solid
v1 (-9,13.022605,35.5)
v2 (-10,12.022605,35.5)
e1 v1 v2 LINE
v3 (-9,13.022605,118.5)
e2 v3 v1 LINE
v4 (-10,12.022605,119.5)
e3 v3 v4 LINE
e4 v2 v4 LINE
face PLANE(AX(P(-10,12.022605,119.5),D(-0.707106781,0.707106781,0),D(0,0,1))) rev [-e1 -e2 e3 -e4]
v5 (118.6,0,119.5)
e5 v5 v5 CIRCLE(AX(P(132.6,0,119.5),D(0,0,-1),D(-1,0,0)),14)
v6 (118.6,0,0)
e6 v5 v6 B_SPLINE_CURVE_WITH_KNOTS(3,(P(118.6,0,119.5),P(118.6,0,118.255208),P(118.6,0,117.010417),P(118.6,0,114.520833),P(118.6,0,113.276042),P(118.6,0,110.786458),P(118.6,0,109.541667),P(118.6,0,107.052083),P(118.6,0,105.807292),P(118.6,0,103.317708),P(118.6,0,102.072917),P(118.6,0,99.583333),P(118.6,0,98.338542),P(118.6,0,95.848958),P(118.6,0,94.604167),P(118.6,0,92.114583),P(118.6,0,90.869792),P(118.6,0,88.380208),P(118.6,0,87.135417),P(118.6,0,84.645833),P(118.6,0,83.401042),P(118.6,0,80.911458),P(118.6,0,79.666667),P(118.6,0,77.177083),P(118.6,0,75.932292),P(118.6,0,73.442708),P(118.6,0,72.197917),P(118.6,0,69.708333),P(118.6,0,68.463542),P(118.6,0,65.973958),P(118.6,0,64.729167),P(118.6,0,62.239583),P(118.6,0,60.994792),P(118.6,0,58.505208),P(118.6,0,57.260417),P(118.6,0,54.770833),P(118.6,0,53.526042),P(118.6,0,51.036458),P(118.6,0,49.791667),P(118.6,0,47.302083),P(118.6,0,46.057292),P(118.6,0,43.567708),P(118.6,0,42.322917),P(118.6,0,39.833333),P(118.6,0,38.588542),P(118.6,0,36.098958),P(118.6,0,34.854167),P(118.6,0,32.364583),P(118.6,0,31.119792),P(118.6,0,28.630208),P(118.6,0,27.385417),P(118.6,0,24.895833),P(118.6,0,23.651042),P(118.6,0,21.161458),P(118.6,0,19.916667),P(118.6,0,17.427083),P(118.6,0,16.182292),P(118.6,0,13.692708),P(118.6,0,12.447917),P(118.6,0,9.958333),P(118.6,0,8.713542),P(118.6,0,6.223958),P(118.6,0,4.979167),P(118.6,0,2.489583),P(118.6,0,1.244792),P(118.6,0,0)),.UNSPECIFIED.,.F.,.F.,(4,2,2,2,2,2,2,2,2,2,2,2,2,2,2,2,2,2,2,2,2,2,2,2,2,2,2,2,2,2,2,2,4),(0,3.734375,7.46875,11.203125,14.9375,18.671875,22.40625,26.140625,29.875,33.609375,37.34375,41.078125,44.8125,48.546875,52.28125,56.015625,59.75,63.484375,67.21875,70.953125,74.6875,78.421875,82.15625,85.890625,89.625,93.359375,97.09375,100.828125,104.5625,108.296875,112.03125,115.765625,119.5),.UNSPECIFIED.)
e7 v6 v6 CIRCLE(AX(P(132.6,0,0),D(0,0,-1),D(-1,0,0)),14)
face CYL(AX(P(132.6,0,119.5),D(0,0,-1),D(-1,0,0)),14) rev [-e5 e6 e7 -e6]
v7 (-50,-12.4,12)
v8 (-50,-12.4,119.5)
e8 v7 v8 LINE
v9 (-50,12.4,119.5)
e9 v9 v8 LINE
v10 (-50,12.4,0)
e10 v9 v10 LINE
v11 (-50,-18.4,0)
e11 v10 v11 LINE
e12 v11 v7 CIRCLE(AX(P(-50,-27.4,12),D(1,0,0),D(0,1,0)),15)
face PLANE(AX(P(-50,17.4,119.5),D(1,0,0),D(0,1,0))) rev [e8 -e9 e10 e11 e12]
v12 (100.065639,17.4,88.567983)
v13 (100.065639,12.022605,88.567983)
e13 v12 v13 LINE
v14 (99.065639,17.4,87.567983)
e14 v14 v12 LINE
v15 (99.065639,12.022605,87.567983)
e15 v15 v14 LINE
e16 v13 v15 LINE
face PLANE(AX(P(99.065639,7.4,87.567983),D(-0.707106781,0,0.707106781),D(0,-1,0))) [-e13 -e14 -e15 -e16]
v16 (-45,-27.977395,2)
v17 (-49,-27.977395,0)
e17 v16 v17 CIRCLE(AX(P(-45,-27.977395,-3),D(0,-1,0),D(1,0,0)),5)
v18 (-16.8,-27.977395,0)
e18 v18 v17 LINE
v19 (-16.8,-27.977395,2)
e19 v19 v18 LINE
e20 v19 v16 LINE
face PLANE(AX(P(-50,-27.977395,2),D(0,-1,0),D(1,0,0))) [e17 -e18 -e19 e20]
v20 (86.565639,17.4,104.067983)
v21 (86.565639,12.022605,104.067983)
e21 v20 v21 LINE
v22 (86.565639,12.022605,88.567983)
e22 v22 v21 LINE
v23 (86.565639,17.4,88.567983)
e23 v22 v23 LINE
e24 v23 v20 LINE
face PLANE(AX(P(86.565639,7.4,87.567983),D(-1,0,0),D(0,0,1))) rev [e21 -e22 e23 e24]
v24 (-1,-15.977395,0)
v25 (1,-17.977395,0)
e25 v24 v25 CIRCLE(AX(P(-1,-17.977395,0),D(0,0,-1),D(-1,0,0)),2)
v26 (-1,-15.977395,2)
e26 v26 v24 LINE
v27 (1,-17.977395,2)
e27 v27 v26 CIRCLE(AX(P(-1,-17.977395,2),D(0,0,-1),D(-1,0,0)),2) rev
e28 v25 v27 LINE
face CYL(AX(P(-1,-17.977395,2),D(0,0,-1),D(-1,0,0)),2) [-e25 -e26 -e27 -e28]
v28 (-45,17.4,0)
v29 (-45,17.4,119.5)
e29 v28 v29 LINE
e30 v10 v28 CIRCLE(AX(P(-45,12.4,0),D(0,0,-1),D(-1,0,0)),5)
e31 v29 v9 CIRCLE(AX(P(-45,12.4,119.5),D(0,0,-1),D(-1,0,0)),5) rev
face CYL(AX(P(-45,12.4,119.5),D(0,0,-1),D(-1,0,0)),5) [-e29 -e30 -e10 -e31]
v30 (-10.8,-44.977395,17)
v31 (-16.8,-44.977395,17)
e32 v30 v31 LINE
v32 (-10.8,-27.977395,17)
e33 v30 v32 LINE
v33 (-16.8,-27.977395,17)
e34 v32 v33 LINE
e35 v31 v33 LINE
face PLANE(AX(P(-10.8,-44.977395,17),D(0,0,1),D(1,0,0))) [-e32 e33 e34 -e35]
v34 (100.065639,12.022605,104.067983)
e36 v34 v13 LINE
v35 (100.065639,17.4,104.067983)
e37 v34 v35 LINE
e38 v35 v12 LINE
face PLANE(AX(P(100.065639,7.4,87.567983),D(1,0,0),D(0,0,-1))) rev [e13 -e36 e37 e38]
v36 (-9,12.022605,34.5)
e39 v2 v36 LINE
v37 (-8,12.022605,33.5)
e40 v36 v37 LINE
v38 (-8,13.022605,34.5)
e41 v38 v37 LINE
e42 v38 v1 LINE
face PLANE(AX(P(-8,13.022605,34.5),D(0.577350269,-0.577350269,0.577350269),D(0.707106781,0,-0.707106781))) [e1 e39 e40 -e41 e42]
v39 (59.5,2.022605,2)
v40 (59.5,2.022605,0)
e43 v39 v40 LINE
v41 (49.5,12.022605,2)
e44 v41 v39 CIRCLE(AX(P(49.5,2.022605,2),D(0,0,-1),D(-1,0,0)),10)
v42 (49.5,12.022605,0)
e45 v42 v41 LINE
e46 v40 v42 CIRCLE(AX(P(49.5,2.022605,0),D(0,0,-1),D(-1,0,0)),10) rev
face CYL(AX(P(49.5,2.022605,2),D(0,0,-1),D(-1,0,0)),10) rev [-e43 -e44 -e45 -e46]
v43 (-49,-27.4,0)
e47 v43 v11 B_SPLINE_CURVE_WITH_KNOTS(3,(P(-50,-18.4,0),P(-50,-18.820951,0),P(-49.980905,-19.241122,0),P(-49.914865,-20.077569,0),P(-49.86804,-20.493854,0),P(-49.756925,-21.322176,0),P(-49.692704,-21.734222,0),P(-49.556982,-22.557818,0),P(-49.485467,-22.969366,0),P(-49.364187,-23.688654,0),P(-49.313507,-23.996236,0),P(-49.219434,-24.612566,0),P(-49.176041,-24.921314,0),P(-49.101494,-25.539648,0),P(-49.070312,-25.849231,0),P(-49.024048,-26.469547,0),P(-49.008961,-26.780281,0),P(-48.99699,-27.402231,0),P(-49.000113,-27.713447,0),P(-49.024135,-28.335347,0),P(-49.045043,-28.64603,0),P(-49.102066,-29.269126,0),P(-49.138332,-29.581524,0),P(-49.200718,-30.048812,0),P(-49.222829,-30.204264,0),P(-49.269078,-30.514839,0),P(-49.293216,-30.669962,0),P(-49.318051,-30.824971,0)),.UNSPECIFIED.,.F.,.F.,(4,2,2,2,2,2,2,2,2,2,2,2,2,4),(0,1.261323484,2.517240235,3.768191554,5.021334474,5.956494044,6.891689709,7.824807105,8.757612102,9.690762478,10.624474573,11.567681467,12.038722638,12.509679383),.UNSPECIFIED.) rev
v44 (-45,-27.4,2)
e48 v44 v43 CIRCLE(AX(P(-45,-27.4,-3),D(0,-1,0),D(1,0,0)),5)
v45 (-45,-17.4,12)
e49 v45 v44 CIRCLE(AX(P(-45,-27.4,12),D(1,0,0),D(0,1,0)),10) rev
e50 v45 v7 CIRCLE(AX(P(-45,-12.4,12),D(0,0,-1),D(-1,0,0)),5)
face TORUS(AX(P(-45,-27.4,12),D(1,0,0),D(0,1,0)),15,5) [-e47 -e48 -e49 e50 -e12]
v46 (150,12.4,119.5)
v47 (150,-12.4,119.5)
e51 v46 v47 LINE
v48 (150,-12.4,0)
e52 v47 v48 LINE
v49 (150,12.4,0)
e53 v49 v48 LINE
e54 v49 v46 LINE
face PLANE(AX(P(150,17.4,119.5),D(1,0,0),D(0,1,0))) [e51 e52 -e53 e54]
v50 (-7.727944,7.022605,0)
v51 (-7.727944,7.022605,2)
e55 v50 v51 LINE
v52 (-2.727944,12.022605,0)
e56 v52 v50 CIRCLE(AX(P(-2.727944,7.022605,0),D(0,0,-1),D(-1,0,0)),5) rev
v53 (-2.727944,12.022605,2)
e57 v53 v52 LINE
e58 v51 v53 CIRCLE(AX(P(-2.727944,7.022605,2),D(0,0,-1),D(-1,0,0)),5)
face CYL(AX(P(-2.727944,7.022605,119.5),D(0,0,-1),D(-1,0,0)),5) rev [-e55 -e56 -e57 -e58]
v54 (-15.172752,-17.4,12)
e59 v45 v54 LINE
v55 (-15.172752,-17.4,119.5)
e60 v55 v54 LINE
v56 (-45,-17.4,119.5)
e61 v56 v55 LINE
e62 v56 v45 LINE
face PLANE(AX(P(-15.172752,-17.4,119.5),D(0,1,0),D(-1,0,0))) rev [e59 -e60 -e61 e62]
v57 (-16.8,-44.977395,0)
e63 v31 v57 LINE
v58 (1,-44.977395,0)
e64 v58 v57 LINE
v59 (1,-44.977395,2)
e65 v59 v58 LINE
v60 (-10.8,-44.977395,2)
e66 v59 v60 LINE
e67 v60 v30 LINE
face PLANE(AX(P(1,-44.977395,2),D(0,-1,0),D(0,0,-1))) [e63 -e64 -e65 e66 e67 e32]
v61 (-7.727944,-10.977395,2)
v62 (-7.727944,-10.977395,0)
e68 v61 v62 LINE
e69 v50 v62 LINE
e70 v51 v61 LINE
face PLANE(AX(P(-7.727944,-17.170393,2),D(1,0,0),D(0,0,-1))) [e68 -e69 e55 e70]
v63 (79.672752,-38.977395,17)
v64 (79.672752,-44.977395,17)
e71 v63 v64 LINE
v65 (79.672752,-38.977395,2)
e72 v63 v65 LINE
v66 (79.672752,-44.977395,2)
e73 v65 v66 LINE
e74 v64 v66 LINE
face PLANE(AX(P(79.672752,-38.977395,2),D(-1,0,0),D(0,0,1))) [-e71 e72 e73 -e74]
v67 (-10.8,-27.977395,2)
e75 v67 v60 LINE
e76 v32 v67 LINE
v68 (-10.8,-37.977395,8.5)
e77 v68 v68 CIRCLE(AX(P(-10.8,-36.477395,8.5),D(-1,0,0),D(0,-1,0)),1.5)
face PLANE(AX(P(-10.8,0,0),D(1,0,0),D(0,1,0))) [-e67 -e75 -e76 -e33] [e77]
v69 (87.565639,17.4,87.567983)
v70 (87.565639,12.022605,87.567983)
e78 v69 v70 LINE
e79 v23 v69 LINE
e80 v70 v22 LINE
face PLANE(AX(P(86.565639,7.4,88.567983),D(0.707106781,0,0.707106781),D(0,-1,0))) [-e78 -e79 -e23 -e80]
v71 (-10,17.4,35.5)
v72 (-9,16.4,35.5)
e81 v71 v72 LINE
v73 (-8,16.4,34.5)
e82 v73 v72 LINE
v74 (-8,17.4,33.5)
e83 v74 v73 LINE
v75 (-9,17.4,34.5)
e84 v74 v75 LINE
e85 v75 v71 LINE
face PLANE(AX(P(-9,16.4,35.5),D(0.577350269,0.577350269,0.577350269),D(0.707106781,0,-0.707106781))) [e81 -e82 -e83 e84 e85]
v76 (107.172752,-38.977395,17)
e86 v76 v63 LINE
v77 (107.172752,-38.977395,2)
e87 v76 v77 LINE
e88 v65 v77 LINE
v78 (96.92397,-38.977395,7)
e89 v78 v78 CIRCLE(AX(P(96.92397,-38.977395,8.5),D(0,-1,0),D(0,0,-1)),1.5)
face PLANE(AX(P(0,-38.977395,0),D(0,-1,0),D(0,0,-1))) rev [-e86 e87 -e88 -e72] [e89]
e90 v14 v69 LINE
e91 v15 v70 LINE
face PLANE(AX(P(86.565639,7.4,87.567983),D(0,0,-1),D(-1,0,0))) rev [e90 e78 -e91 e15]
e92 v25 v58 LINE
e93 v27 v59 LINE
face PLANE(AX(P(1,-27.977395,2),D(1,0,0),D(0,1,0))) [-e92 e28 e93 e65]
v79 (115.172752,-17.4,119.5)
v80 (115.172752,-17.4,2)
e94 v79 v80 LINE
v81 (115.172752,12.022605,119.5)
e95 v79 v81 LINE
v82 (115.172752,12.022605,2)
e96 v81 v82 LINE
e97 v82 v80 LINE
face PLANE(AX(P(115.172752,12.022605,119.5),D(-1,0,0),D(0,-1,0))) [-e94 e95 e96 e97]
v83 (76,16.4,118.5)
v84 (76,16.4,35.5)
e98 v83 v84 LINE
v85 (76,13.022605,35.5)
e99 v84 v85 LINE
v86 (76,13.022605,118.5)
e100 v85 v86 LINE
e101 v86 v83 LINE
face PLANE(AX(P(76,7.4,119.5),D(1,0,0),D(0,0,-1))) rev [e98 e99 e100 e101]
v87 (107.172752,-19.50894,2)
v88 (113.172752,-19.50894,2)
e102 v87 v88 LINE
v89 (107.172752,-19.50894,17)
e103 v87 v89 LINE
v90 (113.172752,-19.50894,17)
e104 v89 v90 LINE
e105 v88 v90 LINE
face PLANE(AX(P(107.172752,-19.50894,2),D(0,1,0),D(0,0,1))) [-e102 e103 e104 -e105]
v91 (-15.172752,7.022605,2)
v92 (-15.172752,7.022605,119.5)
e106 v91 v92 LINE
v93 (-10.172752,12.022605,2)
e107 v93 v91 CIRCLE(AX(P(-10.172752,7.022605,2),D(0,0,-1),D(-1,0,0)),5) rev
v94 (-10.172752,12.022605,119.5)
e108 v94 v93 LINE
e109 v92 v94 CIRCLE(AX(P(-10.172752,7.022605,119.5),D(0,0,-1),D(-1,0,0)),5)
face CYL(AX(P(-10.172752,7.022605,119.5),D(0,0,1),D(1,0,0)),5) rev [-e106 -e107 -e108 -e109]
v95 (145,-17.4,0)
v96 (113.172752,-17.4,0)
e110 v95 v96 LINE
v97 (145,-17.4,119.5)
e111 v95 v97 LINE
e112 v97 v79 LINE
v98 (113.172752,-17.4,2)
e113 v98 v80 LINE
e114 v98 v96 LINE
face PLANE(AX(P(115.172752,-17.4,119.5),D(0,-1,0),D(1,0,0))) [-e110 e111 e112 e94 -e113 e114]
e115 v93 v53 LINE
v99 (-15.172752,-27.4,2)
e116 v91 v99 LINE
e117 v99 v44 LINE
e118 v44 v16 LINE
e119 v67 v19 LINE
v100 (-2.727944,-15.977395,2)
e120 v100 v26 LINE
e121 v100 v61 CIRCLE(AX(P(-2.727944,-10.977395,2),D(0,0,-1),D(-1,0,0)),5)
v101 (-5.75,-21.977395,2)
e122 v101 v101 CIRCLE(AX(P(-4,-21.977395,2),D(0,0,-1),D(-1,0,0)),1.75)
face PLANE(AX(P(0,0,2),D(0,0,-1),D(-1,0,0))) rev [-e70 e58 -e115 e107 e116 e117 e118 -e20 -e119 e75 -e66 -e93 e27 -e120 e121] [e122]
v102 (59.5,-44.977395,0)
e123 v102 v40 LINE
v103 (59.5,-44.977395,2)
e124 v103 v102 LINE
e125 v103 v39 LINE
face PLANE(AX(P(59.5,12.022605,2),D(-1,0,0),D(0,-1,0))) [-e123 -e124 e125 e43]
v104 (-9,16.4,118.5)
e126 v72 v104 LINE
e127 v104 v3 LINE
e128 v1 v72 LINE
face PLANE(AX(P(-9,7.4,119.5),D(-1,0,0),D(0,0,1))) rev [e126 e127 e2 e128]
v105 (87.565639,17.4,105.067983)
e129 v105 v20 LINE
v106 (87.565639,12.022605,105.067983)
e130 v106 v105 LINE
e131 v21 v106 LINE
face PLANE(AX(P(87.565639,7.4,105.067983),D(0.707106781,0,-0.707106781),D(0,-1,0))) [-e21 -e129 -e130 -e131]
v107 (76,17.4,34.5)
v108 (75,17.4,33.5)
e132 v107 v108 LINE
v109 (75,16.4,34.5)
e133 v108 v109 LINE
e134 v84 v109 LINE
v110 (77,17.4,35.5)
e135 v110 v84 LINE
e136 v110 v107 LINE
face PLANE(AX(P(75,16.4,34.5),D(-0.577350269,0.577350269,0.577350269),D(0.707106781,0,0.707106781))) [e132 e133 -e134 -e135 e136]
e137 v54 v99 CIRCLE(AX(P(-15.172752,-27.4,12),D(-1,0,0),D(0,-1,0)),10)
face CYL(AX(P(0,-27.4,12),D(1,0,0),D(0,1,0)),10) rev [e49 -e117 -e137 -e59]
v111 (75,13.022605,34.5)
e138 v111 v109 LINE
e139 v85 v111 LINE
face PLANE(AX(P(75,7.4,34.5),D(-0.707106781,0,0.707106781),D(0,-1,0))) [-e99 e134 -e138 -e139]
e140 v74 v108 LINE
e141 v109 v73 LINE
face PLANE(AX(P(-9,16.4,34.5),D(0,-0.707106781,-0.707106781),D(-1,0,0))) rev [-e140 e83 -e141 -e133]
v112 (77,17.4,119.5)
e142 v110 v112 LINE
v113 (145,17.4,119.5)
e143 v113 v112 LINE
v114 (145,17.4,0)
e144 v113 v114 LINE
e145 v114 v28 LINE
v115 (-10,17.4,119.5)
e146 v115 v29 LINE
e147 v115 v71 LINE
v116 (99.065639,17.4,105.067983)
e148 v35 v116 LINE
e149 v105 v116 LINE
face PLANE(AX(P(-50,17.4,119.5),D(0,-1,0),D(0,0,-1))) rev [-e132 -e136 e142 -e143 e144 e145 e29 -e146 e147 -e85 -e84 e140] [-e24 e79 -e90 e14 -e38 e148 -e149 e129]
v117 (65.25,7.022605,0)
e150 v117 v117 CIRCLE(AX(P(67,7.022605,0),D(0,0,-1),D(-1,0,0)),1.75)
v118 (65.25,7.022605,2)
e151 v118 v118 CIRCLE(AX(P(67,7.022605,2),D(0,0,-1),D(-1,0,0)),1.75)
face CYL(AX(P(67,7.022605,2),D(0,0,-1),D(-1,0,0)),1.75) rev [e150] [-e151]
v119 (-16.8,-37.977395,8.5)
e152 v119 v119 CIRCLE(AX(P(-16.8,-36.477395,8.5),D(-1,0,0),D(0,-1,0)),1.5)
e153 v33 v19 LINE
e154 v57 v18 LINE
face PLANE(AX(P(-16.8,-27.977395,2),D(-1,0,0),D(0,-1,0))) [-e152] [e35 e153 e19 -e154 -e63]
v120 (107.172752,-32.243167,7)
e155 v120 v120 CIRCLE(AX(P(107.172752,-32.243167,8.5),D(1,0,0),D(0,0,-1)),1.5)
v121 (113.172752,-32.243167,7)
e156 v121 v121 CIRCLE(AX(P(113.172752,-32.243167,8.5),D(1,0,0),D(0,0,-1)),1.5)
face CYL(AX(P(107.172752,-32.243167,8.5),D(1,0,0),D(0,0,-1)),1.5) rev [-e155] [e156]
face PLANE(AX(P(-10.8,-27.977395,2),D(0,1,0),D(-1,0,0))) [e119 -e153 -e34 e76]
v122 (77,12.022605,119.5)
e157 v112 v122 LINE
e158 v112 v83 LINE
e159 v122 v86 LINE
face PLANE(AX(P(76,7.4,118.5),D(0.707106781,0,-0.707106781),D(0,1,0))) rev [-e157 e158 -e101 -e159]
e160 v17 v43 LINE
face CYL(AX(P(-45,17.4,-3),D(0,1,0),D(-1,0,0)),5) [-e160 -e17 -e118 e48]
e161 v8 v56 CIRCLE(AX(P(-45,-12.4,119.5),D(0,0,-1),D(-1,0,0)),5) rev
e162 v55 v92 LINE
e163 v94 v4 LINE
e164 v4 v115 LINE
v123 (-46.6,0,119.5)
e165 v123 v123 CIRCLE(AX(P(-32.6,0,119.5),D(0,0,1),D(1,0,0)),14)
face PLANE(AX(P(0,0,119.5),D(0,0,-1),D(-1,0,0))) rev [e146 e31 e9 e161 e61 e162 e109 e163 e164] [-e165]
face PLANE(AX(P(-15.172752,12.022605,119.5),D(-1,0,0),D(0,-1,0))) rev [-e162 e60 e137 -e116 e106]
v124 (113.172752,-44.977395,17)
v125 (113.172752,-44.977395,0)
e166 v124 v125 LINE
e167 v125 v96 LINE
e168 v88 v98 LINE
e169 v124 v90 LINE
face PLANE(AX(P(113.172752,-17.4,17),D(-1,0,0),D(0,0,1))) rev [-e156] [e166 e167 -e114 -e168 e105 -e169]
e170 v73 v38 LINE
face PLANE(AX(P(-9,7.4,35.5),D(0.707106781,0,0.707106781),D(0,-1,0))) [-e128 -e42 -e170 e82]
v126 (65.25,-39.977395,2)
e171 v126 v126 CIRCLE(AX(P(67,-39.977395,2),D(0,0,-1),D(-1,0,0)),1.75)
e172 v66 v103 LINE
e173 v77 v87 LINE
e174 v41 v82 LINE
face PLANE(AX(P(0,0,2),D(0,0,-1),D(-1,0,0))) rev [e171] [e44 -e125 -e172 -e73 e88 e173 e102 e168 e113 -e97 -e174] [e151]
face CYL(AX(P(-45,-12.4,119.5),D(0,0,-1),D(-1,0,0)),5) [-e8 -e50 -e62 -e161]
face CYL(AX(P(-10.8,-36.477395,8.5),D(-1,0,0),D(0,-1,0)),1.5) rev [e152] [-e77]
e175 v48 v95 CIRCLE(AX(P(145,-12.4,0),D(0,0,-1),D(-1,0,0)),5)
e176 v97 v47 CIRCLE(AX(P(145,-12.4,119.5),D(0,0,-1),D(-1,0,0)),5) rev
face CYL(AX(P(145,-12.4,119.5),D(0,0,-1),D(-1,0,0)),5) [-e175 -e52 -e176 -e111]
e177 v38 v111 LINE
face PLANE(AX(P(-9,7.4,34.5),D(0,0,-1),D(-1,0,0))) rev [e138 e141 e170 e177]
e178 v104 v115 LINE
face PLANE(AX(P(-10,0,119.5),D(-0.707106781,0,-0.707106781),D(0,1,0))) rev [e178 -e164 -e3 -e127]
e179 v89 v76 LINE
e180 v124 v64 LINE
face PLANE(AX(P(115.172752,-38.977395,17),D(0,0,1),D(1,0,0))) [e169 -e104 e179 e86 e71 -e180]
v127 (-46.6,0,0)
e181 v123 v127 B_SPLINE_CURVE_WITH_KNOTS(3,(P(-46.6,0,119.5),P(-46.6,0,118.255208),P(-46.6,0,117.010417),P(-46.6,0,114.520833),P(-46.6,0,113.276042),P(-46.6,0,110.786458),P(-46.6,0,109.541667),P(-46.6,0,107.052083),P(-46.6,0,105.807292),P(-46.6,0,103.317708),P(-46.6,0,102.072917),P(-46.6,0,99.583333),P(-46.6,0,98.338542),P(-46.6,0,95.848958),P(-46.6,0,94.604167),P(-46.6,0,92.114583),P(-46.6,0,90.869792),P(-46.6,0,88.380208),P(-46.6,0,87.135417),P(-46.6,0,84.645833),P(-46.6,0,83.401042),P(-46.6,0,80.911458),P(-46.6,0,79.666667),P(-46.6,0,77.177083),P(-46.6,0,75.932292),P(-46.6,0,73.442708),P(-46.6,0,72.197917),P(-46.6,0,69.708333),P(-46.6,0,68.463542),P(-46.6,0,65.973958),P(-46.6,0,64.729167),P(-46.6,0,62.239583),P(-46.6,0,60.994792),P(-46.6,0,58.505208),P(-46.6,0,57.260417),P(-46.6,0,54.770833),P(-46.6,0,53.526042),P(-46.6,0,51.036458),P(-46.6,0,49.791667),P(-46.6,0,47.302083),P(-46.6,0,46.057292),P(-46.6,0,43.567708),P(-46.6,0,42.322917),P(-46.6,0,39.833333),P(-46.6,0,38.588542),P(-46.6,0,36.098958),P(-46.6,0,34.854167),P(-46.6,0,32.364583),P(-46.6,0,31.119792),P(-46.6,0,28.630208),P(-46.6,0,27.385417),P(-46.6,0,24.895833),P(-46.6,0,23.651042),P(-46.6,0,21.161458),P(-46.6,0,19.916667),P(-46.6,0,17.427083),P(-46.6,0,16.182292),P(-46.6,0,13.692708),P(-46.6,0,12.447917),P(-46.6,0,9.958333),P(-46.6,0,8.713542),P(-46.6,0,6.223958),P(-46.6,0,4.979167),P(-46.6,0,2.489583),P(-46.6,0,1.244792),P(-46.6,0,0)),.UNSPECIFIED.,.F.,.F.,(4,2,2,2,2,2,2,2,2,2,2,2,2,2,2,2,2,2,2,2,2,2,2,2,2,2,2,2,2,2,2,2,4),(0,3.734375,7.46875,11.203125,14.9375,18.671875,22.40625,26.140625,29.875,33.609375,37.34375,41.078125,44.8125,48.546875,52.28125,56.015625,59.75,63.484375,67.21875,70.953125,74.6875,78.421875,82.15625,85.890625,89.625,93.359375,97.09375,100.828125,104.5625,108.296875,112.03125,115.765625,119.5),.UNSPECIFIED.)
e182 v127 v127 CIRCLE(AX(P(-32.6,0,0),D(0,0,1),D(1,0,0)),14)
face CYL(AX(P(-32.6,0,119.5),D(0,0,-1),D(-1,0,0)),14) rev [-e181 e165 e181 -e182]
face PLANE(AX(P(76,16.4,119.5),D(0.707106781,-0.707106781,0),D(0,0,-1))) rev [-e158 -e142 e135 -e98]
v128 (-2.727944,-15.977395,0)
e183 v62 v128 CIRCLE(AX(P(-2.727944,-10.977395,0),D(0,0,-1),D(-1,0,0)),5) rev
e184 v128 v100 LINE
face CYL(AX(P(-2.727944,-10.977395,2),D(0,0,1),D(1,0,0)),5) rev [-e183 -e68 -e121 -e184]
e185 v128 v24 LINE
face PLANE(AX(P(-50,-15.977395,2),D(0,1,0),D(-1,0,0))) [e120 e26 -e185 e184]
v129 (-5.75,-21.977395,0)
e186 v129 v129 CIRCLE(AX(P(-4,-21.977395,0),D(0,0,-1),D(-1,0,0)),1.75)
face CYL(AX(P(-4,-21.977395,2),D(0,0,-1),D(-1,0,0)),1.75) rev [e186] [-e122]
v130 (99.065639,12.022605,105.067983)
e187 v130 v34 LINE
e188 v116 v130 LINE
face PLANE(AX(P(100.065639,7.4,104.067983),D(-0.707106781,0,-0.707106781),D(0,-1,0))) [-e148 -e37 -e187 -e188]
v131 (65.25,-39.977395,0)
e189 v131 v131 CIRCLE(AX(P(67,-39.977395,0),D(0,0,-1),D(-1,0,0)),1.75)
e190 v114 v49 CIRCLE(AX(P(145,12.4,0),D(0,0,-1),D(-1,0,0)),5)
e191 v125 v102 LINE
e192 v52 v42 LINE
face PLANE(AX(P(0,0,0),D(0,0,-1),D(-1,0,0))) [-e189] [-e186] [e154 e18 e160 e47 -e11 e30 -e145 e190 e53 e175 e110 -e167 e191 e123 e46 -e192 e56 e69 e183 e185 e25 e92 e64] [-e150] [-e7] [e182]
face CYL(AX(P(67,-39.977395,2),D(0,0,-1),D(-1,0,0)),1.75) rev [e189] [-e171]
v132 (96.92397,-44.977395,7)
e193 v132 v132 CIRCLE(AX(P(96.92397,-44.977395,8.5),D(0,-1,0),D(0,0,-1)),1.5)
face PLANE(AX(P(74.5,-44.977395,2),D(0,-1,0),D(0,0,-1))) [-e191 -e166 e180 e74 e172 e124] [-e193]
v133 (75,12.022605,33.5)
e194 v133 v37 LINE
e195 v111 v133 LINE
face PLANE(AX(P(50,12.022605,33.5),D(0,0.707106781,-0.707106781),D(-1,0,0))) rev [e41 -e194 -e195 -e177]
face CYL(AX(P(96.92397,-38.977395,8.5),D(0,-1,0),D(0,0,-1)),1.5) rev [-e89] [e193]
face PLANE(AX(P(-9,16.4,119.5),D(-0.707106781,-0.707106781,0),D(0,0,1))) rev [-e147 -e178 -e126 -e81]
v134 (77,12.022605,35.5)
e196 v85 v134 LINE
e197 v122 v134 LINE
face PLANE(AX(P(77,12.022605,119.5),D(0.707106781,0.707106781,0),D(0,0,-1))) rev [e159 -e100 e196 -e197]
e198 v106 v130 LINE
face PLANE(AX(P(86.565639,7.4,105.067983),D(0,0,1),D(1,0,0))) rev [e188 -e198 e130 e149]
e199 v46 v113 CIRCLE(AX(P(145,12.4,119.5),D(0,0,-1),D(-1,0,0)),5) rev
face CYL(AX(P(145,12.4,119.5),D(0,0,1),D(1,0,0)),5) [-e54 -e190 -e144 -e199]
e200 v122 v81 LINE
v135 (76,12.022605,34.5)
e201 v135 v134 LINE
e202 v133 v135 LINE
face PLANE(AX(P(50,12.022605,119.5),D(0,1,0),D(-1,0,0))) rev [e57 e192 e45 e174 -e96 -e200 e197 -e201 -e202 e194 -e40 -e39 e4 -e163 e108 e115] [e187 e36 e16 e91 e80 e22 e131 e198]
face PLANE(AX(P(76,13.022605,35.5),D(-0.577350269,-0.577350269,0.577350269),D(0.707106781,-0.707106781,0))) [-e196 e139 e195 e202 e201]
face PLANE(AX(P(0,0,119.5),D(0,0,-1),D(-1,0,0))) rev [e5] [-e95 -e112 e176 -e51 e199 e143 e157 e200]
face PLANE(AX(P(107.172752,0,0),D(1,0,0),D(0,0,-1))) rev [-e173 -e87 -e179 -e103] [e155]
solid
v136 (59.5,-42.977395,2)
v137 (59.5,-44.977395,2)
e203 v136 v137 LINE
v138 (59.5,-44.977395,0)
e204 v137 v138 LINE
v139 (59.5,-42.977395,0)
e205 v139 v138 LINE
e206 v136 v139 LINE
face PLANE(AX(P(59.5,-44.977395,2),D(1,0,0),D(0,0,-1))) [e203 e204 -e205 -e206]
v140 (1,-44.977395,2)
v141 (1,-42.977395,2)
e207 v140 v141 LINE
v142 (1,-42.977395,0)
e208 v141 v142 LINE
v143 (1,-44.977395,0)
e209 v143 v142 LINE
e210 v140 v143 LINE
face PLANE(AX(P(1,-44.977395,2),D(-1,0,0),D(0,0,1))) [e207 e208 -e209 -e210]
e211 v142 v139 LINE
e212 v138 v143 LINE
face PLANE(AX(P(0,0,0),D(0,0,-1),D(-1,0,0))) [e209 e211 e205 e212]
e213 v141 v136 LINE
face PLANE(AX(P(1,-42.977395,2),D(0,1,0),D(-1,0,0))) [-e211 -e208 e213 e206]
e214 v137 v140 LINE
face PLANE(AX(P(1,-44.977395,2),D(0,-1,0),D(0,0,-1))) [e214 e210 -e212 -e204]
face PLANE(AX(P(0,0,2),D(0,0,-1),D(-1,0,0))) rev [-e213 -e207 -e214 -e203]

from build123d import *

# Parameters (mm, degrees)
SKETCH1_R            = 14
BOSS_EXTRUDE1_DEPTH  = 119.5
SKETCH5_W            = 85
SKETCH5_H            = 85
CUT_EXTRUDE2_DEPTH   = 10
CHAMFER2_SIZE        = 1
SKETCH6_W            = 15
SKETCH6_H            = 57
SKETCH6_W_2          = 51
SKETCH6_H_2          = 12
BOSS_EXTRUDE3_DEPTH  = 2
SKETCH7_R            = 1.75
CUT_EXTRUDE3_DEPTH   = 2
FILLET1_R            = 10
FILLET2_R            = 10
SKETCH8_W            = 13.5
SKETCH8_H            = 17.5
CUT_EXTRUDE4_DEPTH   = 10
CHAMFER4_SIZE        = 1
SKETCH10_W           = 9.140808063
SKETCH10_H           = 30.26858539
BOSS_EXTRUDE4_DEPTH  = 2
FILLET3_R            = 5
FILLET4_R            = 5
FILLET5_R            = 5
SKETCH11_W           = 40.67275181
SKETCH11_H           = 57
BOSS_EXTRUDE5_DEPTH  = 2
SKETCH13_W           = 35.5
SKETCH13_H           = 15
BOSS_EXTRUDE6_DEPTH  = 6
SKETCH14_W           = 2
SKETCH14_H           = 27.577394829
CUT_EXTRUDE5_DEPTH   = 17
SKETCH15_W           = 17.8
SKETCH15_H           = 17
BOSS_EXTRUDE7_DEPTH  = 2
SKETCH16_W           = 15
SKETCH16_H           = 17
BOSS_EXTRUDE8_DEPTH  = 6
FILLET6_R            = 2
SKETCH17_W           = 58.5
SKETCH17_H           = 2
BOSS_EXTRUDE9_DEPTH  = 2
SKETCH18_W           = 15
SKETCH18_H           = 19.468455061
BOSS_EXTRUDE10_DEPTH = 6
SKETCH19_R           = 1.5
CUT_EXTRUDE6_DEPTH   = 6
SKETCH21_R           = 1.5
CUT_EXTRUDE7_DEPTH   = 6
SKETCH22_R           = 1.5
CUT_EXTRUDE8_DEPTH   = 6


with BuildPart() as part:
    # Sketch1 → Boss-Extrude1 (new body)
    with BuildSketch(Plane.XY):
        Polygon((-50, 17.4), (-15.2, 17.4), (50, 17.4), (50, 12.022605171), (-15.17275181, 12.022605171), (-15.17275181, -17.4), (-50, -17.4), align=None)
        with Locations(Location((-32.6, 0, 0), (0, 0, 180))):
            Circle(SKETCH1_R, mode=Mode.SUBTRACT)
    boss_extrude1 = extrude(amount=BOSS_EXTRUDE1_DEPTH)

    # Mirror1: Boss-Extrude1 across plane
    add(boss_extrude1.mirror(Plane(origin=(50, 17.4, 119.5), x_dir=(0, 0, 1), z_dir=(-1, 0, 0))))

    # Sketch5 → Cut-Extrude2 (cut)
    with BuildSketch(Plane(origin=(0, 17.4, 0), x_dir=(1, 0, 0), z_dir=(0, 1, 0))):
        with Locations((33.5, -77)):
            Rectangle(SKETCH5_W, SKETCH5_H)
    extrude(amount=-CUT_EXTRUDE2_DEPTH, mode=Mode.SUBTRACT)

    # Chamfer2
    chamfer2_edges = [part.edges().sort_by_distance(p)[0] for p in [
        (-9, 12.022605171, 77),
        (-9, 14.711302586, 119.5),
        (33.5, 12.022605171, 34.5),
        (-9, 14.711302586, 34.5),
        (76, 12.022605171, 77),
        (76, 14.711302586, 34.5),
        (76, 14.711302586, 119.5),
        (-9, 17.4, 77),
        (76, 17.4, 77),
        (33.5, 17.4, 34.5),
    ]]
    chamfer(chamfer2_edges, length=CHAMFER2_SIZE)

    # Sketch6 → Boss-Extrude3 (add)
    with BuildSketch(Plane(origin=(0, 0, 0), x_dir=(-1, 0, 0), z_dir=(0, 0, -1))):
        with Locations((-67, -16.477394829)):
            Rectangle(SKETCH6_W, SKETCH6_H)
        with Locations((24.5, -21.977394829)):
            Rectangle(SKETCH6_W_2, SKETCH6_H_2)
    extrude(amount=-BOSS_EXTRUDE3_DEPTH)

    # Sketch7 → Cut-Extrude3 (cut)
    with BuildSketch(Plane(origin=(0, 0, 0), x_dir=(-1, 0, 0), z_dir=(0, 0, -1))):
        with Locations((4, -21.977394829)):
            Circle(SKETCH7_R)
        with Locations((-67, 7.022605171)):
            Circle(SKETCH7_R)
        with Locations((-67, -39.977394829)):
            Circle(SKETCH7_R)
    extrude(amount=-CUT_EXTRUDE3_DEPTH, mode=Mode.SUBTRACT)

    # Fillet1
    fillet1_edges = [part.edges().sort_by_distance(p)[0] for p in [
        (-32.586375905, -17.4, 2),
    ]]
    fillet(fillet1_edges, radius=FILLET1_R)

    # Fillet2
    fillet2_edges = [part.edges().sort_by_distance(p)[0] for p in [
        (59.5, 12.022605171, 1),
    ]]
    fillet(fillet2_edges, radius=FILLET2_R)

    # Sketch8 → Cut-Extrude4 (cut)
    with BuildSketch(Plane(origin=(0, 17.4, 0), x_dir=(1, 0, 0), z_dir=(0, 1, 0))):
        with Locations((93.315639073, -96.31798342)):
            Rectangle(SKETCH8_W, SKETCH8_H)
    extrude(amount=-CUT_EXTRUDE4_DEPTH, mode=Mode.SUBTRACT)

    # Chamfer4
    chamfer4_edges = [part.edges().sort_by_distance(p)[0] for p in [
        (86.565639073, 14.711302586, 105.06798342),
        (86.565639073, 14.711302586, 87.56798342),
        (100.065639073, 14.711302586, 87.56798342),
        (100.065639073, 14.711302586, 105.06798342),
    ]]
    chamfer(chamfer4_edges, length=CHAMFER4_SIZE)

    # Sketch10 → Boss-Extrude4 (add)
    with BuildSketch(Plane(origin=(0, 0, 0), x_dir=(-1, 0, 0), z_dir=(0, 0, -1))):
        with Locations((12.298347732, -2.03609998)):
            Rectangle(SKETCH10_W, SKETCH10_H)
    extrude(amount=-BOSS_EXTRUDE4_DEPTH)

    # Fillet3
    fillet3_edges = [part.edges().sort_by_distance(p)[0] for p in [
        (-7.7279437, -15.977394829, 1),
    ]]
    fillet(fillet3_edges, radius=FILLET3_R)

    # Fillet4
    fillet4_edges = [part.edges().sort_by_distance(p)[0] for p in [
        (-7.7279437, 12.022605171, 1),
    ]]
    fillet(fillet4_edges, radius=FILLET4_R)

    # Fillet5
    # the kernel refuses this fillet: 5 mm, written as the material it adds along each edge
    with BuildSketch(Plane(origin=(-15.17275181, 12.022605171, 2), x_dir=(0, -1, 0), z_dir=(0, 0, 1))) as fillet5_piece_1:
        with BuildLine():
            CenterArc((FILLET5_R, FILLET5_R), FILLET5_R, 180, 90)
            Line((0, FILLET5_R), (0, 0))
            Line((0, 0), (FILLET5_R, 0))
        make_face()
    extrude(amount=117.5)
    # the kernel refuses this fillet: 5 mm, written as the material it takes off along each edge
    with BuildSketch(Plane(origin=(150, 17.4, -12.5), x_dir=(-1, 0, 0), z_dir=(0, 0, 1)), Plane(origin=(150, -17.4, -12.5), x_dir=(0, 1, 0), z_dir=(0, 0, 1)), Plane(origin=(-50, 17.4, -12.5), x_dir=(0, -1, 0), z_dir=(0, 0, 1))) as fillet5_2_piece_1:
        with BuildLine():
            CenterArc((FILLET5_R, FILLET5_R), FILLET5_R, 180, 90)
            Line((0, FILLET5_R), (0, 0))
            Line((0, 0), (FILLET5_R, 0))
        make_face()
    extrude(amount=144.5, mode=Mode.SUBTRACT)
    with BuildSketch(Plane(origin=(-50, -27.4, 2), x_dir=(0, 0, -1), z_dir=(0, -1, 0))) as fillet5_2_piece_2:
        with BuildLine():
            CenterArc((FILLET5_R, FILLET5_R), FILLET5_R, 180, 90)
            Line((0, FILLET5_R), (0, 0))
            Line((0, 0), (FILLET5_R, 0))
        make_face()
    extrude(amount=13.077394829, mode=Mode.SUBTRACT)
    with BuildSketch(Plane(origin=(-50, -27.4, 12), x_dir=(0, 0, -1), z_dir=(0, -1, 0))) as fillet5_2_piece_3:
        with BuildLine():
            CenterArc((10 + FILLET5_R, FILLET5_R), FILLET5_R, 180, 90)
            Line((10, FILLET5_R), (10, 0))
            Line((10, 0), (10 + FILLET5_R, 0))
        make_face()
    revolve(axis=Axis((-50, -27.4, 12), (1, 0, 0)), revolution_arc=90, mode=Mode.SUBTRACT)
    with BuildSketch(Plane(origin=(-50, -17.4, 12), x_dir=(0, 1, 0), z_dir=(0, 0, 1))) as fillet5_2_piece_4:
        with BuildLine():
            CenterArc((FILLET5_R, -FILLET5_R), FILLET5_R, 90, 90)
            Line((0, -FILLET5_R), (0, 0))
            Line((0, 0), (FILLET5_R, 0))
        make_face()
    extrude(amount=120, mode=Mode.SUBTRACT)

    # Sketch11 → Boss-Extrude5 (add)
    with BuildSketch(Plane(origin=(0, 0, 0), x_dir=(-1, 0, 0), z_dir=(0, 0, -1))):
        with Locations((-94.836375905, -16.477394829)):
            Rectangle(SKETCH11_W, SKETCH11_H)
    extrude(amount=-BOSS_EXTRUDE5_DEPTH)

    # Sketch13 → Boss-Extrude6 (add)
    with BuildSketch(Plane(origin=(0, -44.977394829, 0), x_dir=(-1, 0, 0), z_dir=(0, -1, 0))):
        with Locations((-97.42275181, -9.5)):
            Rectangle(SKETCH13_W, SKETCH13_H)
    extrude(amount=-BOSS_EXTRUDE6_DEPTH)

    # Sketch14 → Cut-Extrude5 (cut)
    with BuildSketch(Plane(origin=(0, 0, 0), x_dir=(-1, 0, 0), z_dir=(0, 0, -1))):
        with Locations((-114.17275181, -31.188697415)):
            Rectangle(SKETCH14_W, SKETCH14_H)
    extrude(amount=-CUT_EXTRUDE5_DEPTH, mode=Mode.SUBTRACT)

    # Sketch15 → Boss-Extrude7 (add)
    with BuildSketch(Plane(origin=(0, 0, 0), x_dir=(-1, 0, 0), z_dir=(0, 0, -1))):
        with Locations((7.9, -36.477394829)):
            Rectangle(SKETCH15_W, SKETCH15_H)
    extrude(amount=-BOSS_EXTRUDE7_DEPTH)

    # Sketch16 → Boss-Extrude8 (add)
    with BuildSketch(Plane.ZY.offset(16.8)):
        with Locations((9.5, -36.477394829)):
            Rectangle(SKETCH16_W, SKETCH16_H)
    extrude(amount=-BOSS_EXTRUDE8_DEPTH)

    # Fillet6
    fillet6_edges = [part.edges().sort_by_distance(p)[0] for p in [
        (1, -15.977394829, 1),
    ]]
    fillet(fillet6_edges, radius=FILLET6_R)

    # Sketch18 → Boss-Extrude10 (add)
    with BuildSketch(Plane(origin=(113.17275181, 0, 0), x_dir=(0, 0, -1), z_dir=(1, 0, 0))):
        with Locations((-9.5, -29.243167299)):
            Rectangle(SKETCH18_W, SKETCH18_H)
    extrude(amount=-BOSS_EXTRUDE10_DEPTH)

    # Sketch19 → Cut-Extrude6 (cut)
    with BuildSketch(Plane(origin=(113.17275181, 0, 0), x_dir=(0, 0, -1), z_dir=(1, 0, 0))):
        with Locations((-8.5, -32.243167298)):
            Circle(SKETCH19_R)
    extrude(amount=-CUT_EXTRUDE6_DEPTH, mode=Mode.SUBTRACT)

    # Sketch21 → Cut-Extrude7 (cut)
    with BuildSketch(Plane.XZ.offset(44.977394829)):
        with Locations(Location((96.923969756, 8.5, 0), (0, 0, 270))):
            Circle(SKETCH21_R)
    extrude(amount=-CUT_EXTRUDE7_DEPTH, mode=Mode.SUBTRACT)

    # Sketch22 → Cut-Extrude8 (cut)
    with BuildSketch(Plane.ZY.offset(16.8)):
        with Locations(Location((8.5, -36.477394829, 0), (0, 0, 270))):
            Circle(SKETCH22_R)
    extrude(amount=-CUT_EXTRUDE8_DEPTH, mode=Mode.SUBTRACT)


with BuildPart() as body_2:
    # Sketch17 → Boss-Extrude9 (new body)
    with BuildSketch(Plane(origin=(0, 0, 0), x_dir=(-1, 0, 0), z_dir=(0, 0, -1))):
        with Locations((-30.25, -43.977394829)):
            Rectangle(SKETCH17_W, SKETCH17_H)
    extrude(amount=-BOSS_EXTRUDE9_DEPTH)


solid = Compound([part.part, body_2.part])
